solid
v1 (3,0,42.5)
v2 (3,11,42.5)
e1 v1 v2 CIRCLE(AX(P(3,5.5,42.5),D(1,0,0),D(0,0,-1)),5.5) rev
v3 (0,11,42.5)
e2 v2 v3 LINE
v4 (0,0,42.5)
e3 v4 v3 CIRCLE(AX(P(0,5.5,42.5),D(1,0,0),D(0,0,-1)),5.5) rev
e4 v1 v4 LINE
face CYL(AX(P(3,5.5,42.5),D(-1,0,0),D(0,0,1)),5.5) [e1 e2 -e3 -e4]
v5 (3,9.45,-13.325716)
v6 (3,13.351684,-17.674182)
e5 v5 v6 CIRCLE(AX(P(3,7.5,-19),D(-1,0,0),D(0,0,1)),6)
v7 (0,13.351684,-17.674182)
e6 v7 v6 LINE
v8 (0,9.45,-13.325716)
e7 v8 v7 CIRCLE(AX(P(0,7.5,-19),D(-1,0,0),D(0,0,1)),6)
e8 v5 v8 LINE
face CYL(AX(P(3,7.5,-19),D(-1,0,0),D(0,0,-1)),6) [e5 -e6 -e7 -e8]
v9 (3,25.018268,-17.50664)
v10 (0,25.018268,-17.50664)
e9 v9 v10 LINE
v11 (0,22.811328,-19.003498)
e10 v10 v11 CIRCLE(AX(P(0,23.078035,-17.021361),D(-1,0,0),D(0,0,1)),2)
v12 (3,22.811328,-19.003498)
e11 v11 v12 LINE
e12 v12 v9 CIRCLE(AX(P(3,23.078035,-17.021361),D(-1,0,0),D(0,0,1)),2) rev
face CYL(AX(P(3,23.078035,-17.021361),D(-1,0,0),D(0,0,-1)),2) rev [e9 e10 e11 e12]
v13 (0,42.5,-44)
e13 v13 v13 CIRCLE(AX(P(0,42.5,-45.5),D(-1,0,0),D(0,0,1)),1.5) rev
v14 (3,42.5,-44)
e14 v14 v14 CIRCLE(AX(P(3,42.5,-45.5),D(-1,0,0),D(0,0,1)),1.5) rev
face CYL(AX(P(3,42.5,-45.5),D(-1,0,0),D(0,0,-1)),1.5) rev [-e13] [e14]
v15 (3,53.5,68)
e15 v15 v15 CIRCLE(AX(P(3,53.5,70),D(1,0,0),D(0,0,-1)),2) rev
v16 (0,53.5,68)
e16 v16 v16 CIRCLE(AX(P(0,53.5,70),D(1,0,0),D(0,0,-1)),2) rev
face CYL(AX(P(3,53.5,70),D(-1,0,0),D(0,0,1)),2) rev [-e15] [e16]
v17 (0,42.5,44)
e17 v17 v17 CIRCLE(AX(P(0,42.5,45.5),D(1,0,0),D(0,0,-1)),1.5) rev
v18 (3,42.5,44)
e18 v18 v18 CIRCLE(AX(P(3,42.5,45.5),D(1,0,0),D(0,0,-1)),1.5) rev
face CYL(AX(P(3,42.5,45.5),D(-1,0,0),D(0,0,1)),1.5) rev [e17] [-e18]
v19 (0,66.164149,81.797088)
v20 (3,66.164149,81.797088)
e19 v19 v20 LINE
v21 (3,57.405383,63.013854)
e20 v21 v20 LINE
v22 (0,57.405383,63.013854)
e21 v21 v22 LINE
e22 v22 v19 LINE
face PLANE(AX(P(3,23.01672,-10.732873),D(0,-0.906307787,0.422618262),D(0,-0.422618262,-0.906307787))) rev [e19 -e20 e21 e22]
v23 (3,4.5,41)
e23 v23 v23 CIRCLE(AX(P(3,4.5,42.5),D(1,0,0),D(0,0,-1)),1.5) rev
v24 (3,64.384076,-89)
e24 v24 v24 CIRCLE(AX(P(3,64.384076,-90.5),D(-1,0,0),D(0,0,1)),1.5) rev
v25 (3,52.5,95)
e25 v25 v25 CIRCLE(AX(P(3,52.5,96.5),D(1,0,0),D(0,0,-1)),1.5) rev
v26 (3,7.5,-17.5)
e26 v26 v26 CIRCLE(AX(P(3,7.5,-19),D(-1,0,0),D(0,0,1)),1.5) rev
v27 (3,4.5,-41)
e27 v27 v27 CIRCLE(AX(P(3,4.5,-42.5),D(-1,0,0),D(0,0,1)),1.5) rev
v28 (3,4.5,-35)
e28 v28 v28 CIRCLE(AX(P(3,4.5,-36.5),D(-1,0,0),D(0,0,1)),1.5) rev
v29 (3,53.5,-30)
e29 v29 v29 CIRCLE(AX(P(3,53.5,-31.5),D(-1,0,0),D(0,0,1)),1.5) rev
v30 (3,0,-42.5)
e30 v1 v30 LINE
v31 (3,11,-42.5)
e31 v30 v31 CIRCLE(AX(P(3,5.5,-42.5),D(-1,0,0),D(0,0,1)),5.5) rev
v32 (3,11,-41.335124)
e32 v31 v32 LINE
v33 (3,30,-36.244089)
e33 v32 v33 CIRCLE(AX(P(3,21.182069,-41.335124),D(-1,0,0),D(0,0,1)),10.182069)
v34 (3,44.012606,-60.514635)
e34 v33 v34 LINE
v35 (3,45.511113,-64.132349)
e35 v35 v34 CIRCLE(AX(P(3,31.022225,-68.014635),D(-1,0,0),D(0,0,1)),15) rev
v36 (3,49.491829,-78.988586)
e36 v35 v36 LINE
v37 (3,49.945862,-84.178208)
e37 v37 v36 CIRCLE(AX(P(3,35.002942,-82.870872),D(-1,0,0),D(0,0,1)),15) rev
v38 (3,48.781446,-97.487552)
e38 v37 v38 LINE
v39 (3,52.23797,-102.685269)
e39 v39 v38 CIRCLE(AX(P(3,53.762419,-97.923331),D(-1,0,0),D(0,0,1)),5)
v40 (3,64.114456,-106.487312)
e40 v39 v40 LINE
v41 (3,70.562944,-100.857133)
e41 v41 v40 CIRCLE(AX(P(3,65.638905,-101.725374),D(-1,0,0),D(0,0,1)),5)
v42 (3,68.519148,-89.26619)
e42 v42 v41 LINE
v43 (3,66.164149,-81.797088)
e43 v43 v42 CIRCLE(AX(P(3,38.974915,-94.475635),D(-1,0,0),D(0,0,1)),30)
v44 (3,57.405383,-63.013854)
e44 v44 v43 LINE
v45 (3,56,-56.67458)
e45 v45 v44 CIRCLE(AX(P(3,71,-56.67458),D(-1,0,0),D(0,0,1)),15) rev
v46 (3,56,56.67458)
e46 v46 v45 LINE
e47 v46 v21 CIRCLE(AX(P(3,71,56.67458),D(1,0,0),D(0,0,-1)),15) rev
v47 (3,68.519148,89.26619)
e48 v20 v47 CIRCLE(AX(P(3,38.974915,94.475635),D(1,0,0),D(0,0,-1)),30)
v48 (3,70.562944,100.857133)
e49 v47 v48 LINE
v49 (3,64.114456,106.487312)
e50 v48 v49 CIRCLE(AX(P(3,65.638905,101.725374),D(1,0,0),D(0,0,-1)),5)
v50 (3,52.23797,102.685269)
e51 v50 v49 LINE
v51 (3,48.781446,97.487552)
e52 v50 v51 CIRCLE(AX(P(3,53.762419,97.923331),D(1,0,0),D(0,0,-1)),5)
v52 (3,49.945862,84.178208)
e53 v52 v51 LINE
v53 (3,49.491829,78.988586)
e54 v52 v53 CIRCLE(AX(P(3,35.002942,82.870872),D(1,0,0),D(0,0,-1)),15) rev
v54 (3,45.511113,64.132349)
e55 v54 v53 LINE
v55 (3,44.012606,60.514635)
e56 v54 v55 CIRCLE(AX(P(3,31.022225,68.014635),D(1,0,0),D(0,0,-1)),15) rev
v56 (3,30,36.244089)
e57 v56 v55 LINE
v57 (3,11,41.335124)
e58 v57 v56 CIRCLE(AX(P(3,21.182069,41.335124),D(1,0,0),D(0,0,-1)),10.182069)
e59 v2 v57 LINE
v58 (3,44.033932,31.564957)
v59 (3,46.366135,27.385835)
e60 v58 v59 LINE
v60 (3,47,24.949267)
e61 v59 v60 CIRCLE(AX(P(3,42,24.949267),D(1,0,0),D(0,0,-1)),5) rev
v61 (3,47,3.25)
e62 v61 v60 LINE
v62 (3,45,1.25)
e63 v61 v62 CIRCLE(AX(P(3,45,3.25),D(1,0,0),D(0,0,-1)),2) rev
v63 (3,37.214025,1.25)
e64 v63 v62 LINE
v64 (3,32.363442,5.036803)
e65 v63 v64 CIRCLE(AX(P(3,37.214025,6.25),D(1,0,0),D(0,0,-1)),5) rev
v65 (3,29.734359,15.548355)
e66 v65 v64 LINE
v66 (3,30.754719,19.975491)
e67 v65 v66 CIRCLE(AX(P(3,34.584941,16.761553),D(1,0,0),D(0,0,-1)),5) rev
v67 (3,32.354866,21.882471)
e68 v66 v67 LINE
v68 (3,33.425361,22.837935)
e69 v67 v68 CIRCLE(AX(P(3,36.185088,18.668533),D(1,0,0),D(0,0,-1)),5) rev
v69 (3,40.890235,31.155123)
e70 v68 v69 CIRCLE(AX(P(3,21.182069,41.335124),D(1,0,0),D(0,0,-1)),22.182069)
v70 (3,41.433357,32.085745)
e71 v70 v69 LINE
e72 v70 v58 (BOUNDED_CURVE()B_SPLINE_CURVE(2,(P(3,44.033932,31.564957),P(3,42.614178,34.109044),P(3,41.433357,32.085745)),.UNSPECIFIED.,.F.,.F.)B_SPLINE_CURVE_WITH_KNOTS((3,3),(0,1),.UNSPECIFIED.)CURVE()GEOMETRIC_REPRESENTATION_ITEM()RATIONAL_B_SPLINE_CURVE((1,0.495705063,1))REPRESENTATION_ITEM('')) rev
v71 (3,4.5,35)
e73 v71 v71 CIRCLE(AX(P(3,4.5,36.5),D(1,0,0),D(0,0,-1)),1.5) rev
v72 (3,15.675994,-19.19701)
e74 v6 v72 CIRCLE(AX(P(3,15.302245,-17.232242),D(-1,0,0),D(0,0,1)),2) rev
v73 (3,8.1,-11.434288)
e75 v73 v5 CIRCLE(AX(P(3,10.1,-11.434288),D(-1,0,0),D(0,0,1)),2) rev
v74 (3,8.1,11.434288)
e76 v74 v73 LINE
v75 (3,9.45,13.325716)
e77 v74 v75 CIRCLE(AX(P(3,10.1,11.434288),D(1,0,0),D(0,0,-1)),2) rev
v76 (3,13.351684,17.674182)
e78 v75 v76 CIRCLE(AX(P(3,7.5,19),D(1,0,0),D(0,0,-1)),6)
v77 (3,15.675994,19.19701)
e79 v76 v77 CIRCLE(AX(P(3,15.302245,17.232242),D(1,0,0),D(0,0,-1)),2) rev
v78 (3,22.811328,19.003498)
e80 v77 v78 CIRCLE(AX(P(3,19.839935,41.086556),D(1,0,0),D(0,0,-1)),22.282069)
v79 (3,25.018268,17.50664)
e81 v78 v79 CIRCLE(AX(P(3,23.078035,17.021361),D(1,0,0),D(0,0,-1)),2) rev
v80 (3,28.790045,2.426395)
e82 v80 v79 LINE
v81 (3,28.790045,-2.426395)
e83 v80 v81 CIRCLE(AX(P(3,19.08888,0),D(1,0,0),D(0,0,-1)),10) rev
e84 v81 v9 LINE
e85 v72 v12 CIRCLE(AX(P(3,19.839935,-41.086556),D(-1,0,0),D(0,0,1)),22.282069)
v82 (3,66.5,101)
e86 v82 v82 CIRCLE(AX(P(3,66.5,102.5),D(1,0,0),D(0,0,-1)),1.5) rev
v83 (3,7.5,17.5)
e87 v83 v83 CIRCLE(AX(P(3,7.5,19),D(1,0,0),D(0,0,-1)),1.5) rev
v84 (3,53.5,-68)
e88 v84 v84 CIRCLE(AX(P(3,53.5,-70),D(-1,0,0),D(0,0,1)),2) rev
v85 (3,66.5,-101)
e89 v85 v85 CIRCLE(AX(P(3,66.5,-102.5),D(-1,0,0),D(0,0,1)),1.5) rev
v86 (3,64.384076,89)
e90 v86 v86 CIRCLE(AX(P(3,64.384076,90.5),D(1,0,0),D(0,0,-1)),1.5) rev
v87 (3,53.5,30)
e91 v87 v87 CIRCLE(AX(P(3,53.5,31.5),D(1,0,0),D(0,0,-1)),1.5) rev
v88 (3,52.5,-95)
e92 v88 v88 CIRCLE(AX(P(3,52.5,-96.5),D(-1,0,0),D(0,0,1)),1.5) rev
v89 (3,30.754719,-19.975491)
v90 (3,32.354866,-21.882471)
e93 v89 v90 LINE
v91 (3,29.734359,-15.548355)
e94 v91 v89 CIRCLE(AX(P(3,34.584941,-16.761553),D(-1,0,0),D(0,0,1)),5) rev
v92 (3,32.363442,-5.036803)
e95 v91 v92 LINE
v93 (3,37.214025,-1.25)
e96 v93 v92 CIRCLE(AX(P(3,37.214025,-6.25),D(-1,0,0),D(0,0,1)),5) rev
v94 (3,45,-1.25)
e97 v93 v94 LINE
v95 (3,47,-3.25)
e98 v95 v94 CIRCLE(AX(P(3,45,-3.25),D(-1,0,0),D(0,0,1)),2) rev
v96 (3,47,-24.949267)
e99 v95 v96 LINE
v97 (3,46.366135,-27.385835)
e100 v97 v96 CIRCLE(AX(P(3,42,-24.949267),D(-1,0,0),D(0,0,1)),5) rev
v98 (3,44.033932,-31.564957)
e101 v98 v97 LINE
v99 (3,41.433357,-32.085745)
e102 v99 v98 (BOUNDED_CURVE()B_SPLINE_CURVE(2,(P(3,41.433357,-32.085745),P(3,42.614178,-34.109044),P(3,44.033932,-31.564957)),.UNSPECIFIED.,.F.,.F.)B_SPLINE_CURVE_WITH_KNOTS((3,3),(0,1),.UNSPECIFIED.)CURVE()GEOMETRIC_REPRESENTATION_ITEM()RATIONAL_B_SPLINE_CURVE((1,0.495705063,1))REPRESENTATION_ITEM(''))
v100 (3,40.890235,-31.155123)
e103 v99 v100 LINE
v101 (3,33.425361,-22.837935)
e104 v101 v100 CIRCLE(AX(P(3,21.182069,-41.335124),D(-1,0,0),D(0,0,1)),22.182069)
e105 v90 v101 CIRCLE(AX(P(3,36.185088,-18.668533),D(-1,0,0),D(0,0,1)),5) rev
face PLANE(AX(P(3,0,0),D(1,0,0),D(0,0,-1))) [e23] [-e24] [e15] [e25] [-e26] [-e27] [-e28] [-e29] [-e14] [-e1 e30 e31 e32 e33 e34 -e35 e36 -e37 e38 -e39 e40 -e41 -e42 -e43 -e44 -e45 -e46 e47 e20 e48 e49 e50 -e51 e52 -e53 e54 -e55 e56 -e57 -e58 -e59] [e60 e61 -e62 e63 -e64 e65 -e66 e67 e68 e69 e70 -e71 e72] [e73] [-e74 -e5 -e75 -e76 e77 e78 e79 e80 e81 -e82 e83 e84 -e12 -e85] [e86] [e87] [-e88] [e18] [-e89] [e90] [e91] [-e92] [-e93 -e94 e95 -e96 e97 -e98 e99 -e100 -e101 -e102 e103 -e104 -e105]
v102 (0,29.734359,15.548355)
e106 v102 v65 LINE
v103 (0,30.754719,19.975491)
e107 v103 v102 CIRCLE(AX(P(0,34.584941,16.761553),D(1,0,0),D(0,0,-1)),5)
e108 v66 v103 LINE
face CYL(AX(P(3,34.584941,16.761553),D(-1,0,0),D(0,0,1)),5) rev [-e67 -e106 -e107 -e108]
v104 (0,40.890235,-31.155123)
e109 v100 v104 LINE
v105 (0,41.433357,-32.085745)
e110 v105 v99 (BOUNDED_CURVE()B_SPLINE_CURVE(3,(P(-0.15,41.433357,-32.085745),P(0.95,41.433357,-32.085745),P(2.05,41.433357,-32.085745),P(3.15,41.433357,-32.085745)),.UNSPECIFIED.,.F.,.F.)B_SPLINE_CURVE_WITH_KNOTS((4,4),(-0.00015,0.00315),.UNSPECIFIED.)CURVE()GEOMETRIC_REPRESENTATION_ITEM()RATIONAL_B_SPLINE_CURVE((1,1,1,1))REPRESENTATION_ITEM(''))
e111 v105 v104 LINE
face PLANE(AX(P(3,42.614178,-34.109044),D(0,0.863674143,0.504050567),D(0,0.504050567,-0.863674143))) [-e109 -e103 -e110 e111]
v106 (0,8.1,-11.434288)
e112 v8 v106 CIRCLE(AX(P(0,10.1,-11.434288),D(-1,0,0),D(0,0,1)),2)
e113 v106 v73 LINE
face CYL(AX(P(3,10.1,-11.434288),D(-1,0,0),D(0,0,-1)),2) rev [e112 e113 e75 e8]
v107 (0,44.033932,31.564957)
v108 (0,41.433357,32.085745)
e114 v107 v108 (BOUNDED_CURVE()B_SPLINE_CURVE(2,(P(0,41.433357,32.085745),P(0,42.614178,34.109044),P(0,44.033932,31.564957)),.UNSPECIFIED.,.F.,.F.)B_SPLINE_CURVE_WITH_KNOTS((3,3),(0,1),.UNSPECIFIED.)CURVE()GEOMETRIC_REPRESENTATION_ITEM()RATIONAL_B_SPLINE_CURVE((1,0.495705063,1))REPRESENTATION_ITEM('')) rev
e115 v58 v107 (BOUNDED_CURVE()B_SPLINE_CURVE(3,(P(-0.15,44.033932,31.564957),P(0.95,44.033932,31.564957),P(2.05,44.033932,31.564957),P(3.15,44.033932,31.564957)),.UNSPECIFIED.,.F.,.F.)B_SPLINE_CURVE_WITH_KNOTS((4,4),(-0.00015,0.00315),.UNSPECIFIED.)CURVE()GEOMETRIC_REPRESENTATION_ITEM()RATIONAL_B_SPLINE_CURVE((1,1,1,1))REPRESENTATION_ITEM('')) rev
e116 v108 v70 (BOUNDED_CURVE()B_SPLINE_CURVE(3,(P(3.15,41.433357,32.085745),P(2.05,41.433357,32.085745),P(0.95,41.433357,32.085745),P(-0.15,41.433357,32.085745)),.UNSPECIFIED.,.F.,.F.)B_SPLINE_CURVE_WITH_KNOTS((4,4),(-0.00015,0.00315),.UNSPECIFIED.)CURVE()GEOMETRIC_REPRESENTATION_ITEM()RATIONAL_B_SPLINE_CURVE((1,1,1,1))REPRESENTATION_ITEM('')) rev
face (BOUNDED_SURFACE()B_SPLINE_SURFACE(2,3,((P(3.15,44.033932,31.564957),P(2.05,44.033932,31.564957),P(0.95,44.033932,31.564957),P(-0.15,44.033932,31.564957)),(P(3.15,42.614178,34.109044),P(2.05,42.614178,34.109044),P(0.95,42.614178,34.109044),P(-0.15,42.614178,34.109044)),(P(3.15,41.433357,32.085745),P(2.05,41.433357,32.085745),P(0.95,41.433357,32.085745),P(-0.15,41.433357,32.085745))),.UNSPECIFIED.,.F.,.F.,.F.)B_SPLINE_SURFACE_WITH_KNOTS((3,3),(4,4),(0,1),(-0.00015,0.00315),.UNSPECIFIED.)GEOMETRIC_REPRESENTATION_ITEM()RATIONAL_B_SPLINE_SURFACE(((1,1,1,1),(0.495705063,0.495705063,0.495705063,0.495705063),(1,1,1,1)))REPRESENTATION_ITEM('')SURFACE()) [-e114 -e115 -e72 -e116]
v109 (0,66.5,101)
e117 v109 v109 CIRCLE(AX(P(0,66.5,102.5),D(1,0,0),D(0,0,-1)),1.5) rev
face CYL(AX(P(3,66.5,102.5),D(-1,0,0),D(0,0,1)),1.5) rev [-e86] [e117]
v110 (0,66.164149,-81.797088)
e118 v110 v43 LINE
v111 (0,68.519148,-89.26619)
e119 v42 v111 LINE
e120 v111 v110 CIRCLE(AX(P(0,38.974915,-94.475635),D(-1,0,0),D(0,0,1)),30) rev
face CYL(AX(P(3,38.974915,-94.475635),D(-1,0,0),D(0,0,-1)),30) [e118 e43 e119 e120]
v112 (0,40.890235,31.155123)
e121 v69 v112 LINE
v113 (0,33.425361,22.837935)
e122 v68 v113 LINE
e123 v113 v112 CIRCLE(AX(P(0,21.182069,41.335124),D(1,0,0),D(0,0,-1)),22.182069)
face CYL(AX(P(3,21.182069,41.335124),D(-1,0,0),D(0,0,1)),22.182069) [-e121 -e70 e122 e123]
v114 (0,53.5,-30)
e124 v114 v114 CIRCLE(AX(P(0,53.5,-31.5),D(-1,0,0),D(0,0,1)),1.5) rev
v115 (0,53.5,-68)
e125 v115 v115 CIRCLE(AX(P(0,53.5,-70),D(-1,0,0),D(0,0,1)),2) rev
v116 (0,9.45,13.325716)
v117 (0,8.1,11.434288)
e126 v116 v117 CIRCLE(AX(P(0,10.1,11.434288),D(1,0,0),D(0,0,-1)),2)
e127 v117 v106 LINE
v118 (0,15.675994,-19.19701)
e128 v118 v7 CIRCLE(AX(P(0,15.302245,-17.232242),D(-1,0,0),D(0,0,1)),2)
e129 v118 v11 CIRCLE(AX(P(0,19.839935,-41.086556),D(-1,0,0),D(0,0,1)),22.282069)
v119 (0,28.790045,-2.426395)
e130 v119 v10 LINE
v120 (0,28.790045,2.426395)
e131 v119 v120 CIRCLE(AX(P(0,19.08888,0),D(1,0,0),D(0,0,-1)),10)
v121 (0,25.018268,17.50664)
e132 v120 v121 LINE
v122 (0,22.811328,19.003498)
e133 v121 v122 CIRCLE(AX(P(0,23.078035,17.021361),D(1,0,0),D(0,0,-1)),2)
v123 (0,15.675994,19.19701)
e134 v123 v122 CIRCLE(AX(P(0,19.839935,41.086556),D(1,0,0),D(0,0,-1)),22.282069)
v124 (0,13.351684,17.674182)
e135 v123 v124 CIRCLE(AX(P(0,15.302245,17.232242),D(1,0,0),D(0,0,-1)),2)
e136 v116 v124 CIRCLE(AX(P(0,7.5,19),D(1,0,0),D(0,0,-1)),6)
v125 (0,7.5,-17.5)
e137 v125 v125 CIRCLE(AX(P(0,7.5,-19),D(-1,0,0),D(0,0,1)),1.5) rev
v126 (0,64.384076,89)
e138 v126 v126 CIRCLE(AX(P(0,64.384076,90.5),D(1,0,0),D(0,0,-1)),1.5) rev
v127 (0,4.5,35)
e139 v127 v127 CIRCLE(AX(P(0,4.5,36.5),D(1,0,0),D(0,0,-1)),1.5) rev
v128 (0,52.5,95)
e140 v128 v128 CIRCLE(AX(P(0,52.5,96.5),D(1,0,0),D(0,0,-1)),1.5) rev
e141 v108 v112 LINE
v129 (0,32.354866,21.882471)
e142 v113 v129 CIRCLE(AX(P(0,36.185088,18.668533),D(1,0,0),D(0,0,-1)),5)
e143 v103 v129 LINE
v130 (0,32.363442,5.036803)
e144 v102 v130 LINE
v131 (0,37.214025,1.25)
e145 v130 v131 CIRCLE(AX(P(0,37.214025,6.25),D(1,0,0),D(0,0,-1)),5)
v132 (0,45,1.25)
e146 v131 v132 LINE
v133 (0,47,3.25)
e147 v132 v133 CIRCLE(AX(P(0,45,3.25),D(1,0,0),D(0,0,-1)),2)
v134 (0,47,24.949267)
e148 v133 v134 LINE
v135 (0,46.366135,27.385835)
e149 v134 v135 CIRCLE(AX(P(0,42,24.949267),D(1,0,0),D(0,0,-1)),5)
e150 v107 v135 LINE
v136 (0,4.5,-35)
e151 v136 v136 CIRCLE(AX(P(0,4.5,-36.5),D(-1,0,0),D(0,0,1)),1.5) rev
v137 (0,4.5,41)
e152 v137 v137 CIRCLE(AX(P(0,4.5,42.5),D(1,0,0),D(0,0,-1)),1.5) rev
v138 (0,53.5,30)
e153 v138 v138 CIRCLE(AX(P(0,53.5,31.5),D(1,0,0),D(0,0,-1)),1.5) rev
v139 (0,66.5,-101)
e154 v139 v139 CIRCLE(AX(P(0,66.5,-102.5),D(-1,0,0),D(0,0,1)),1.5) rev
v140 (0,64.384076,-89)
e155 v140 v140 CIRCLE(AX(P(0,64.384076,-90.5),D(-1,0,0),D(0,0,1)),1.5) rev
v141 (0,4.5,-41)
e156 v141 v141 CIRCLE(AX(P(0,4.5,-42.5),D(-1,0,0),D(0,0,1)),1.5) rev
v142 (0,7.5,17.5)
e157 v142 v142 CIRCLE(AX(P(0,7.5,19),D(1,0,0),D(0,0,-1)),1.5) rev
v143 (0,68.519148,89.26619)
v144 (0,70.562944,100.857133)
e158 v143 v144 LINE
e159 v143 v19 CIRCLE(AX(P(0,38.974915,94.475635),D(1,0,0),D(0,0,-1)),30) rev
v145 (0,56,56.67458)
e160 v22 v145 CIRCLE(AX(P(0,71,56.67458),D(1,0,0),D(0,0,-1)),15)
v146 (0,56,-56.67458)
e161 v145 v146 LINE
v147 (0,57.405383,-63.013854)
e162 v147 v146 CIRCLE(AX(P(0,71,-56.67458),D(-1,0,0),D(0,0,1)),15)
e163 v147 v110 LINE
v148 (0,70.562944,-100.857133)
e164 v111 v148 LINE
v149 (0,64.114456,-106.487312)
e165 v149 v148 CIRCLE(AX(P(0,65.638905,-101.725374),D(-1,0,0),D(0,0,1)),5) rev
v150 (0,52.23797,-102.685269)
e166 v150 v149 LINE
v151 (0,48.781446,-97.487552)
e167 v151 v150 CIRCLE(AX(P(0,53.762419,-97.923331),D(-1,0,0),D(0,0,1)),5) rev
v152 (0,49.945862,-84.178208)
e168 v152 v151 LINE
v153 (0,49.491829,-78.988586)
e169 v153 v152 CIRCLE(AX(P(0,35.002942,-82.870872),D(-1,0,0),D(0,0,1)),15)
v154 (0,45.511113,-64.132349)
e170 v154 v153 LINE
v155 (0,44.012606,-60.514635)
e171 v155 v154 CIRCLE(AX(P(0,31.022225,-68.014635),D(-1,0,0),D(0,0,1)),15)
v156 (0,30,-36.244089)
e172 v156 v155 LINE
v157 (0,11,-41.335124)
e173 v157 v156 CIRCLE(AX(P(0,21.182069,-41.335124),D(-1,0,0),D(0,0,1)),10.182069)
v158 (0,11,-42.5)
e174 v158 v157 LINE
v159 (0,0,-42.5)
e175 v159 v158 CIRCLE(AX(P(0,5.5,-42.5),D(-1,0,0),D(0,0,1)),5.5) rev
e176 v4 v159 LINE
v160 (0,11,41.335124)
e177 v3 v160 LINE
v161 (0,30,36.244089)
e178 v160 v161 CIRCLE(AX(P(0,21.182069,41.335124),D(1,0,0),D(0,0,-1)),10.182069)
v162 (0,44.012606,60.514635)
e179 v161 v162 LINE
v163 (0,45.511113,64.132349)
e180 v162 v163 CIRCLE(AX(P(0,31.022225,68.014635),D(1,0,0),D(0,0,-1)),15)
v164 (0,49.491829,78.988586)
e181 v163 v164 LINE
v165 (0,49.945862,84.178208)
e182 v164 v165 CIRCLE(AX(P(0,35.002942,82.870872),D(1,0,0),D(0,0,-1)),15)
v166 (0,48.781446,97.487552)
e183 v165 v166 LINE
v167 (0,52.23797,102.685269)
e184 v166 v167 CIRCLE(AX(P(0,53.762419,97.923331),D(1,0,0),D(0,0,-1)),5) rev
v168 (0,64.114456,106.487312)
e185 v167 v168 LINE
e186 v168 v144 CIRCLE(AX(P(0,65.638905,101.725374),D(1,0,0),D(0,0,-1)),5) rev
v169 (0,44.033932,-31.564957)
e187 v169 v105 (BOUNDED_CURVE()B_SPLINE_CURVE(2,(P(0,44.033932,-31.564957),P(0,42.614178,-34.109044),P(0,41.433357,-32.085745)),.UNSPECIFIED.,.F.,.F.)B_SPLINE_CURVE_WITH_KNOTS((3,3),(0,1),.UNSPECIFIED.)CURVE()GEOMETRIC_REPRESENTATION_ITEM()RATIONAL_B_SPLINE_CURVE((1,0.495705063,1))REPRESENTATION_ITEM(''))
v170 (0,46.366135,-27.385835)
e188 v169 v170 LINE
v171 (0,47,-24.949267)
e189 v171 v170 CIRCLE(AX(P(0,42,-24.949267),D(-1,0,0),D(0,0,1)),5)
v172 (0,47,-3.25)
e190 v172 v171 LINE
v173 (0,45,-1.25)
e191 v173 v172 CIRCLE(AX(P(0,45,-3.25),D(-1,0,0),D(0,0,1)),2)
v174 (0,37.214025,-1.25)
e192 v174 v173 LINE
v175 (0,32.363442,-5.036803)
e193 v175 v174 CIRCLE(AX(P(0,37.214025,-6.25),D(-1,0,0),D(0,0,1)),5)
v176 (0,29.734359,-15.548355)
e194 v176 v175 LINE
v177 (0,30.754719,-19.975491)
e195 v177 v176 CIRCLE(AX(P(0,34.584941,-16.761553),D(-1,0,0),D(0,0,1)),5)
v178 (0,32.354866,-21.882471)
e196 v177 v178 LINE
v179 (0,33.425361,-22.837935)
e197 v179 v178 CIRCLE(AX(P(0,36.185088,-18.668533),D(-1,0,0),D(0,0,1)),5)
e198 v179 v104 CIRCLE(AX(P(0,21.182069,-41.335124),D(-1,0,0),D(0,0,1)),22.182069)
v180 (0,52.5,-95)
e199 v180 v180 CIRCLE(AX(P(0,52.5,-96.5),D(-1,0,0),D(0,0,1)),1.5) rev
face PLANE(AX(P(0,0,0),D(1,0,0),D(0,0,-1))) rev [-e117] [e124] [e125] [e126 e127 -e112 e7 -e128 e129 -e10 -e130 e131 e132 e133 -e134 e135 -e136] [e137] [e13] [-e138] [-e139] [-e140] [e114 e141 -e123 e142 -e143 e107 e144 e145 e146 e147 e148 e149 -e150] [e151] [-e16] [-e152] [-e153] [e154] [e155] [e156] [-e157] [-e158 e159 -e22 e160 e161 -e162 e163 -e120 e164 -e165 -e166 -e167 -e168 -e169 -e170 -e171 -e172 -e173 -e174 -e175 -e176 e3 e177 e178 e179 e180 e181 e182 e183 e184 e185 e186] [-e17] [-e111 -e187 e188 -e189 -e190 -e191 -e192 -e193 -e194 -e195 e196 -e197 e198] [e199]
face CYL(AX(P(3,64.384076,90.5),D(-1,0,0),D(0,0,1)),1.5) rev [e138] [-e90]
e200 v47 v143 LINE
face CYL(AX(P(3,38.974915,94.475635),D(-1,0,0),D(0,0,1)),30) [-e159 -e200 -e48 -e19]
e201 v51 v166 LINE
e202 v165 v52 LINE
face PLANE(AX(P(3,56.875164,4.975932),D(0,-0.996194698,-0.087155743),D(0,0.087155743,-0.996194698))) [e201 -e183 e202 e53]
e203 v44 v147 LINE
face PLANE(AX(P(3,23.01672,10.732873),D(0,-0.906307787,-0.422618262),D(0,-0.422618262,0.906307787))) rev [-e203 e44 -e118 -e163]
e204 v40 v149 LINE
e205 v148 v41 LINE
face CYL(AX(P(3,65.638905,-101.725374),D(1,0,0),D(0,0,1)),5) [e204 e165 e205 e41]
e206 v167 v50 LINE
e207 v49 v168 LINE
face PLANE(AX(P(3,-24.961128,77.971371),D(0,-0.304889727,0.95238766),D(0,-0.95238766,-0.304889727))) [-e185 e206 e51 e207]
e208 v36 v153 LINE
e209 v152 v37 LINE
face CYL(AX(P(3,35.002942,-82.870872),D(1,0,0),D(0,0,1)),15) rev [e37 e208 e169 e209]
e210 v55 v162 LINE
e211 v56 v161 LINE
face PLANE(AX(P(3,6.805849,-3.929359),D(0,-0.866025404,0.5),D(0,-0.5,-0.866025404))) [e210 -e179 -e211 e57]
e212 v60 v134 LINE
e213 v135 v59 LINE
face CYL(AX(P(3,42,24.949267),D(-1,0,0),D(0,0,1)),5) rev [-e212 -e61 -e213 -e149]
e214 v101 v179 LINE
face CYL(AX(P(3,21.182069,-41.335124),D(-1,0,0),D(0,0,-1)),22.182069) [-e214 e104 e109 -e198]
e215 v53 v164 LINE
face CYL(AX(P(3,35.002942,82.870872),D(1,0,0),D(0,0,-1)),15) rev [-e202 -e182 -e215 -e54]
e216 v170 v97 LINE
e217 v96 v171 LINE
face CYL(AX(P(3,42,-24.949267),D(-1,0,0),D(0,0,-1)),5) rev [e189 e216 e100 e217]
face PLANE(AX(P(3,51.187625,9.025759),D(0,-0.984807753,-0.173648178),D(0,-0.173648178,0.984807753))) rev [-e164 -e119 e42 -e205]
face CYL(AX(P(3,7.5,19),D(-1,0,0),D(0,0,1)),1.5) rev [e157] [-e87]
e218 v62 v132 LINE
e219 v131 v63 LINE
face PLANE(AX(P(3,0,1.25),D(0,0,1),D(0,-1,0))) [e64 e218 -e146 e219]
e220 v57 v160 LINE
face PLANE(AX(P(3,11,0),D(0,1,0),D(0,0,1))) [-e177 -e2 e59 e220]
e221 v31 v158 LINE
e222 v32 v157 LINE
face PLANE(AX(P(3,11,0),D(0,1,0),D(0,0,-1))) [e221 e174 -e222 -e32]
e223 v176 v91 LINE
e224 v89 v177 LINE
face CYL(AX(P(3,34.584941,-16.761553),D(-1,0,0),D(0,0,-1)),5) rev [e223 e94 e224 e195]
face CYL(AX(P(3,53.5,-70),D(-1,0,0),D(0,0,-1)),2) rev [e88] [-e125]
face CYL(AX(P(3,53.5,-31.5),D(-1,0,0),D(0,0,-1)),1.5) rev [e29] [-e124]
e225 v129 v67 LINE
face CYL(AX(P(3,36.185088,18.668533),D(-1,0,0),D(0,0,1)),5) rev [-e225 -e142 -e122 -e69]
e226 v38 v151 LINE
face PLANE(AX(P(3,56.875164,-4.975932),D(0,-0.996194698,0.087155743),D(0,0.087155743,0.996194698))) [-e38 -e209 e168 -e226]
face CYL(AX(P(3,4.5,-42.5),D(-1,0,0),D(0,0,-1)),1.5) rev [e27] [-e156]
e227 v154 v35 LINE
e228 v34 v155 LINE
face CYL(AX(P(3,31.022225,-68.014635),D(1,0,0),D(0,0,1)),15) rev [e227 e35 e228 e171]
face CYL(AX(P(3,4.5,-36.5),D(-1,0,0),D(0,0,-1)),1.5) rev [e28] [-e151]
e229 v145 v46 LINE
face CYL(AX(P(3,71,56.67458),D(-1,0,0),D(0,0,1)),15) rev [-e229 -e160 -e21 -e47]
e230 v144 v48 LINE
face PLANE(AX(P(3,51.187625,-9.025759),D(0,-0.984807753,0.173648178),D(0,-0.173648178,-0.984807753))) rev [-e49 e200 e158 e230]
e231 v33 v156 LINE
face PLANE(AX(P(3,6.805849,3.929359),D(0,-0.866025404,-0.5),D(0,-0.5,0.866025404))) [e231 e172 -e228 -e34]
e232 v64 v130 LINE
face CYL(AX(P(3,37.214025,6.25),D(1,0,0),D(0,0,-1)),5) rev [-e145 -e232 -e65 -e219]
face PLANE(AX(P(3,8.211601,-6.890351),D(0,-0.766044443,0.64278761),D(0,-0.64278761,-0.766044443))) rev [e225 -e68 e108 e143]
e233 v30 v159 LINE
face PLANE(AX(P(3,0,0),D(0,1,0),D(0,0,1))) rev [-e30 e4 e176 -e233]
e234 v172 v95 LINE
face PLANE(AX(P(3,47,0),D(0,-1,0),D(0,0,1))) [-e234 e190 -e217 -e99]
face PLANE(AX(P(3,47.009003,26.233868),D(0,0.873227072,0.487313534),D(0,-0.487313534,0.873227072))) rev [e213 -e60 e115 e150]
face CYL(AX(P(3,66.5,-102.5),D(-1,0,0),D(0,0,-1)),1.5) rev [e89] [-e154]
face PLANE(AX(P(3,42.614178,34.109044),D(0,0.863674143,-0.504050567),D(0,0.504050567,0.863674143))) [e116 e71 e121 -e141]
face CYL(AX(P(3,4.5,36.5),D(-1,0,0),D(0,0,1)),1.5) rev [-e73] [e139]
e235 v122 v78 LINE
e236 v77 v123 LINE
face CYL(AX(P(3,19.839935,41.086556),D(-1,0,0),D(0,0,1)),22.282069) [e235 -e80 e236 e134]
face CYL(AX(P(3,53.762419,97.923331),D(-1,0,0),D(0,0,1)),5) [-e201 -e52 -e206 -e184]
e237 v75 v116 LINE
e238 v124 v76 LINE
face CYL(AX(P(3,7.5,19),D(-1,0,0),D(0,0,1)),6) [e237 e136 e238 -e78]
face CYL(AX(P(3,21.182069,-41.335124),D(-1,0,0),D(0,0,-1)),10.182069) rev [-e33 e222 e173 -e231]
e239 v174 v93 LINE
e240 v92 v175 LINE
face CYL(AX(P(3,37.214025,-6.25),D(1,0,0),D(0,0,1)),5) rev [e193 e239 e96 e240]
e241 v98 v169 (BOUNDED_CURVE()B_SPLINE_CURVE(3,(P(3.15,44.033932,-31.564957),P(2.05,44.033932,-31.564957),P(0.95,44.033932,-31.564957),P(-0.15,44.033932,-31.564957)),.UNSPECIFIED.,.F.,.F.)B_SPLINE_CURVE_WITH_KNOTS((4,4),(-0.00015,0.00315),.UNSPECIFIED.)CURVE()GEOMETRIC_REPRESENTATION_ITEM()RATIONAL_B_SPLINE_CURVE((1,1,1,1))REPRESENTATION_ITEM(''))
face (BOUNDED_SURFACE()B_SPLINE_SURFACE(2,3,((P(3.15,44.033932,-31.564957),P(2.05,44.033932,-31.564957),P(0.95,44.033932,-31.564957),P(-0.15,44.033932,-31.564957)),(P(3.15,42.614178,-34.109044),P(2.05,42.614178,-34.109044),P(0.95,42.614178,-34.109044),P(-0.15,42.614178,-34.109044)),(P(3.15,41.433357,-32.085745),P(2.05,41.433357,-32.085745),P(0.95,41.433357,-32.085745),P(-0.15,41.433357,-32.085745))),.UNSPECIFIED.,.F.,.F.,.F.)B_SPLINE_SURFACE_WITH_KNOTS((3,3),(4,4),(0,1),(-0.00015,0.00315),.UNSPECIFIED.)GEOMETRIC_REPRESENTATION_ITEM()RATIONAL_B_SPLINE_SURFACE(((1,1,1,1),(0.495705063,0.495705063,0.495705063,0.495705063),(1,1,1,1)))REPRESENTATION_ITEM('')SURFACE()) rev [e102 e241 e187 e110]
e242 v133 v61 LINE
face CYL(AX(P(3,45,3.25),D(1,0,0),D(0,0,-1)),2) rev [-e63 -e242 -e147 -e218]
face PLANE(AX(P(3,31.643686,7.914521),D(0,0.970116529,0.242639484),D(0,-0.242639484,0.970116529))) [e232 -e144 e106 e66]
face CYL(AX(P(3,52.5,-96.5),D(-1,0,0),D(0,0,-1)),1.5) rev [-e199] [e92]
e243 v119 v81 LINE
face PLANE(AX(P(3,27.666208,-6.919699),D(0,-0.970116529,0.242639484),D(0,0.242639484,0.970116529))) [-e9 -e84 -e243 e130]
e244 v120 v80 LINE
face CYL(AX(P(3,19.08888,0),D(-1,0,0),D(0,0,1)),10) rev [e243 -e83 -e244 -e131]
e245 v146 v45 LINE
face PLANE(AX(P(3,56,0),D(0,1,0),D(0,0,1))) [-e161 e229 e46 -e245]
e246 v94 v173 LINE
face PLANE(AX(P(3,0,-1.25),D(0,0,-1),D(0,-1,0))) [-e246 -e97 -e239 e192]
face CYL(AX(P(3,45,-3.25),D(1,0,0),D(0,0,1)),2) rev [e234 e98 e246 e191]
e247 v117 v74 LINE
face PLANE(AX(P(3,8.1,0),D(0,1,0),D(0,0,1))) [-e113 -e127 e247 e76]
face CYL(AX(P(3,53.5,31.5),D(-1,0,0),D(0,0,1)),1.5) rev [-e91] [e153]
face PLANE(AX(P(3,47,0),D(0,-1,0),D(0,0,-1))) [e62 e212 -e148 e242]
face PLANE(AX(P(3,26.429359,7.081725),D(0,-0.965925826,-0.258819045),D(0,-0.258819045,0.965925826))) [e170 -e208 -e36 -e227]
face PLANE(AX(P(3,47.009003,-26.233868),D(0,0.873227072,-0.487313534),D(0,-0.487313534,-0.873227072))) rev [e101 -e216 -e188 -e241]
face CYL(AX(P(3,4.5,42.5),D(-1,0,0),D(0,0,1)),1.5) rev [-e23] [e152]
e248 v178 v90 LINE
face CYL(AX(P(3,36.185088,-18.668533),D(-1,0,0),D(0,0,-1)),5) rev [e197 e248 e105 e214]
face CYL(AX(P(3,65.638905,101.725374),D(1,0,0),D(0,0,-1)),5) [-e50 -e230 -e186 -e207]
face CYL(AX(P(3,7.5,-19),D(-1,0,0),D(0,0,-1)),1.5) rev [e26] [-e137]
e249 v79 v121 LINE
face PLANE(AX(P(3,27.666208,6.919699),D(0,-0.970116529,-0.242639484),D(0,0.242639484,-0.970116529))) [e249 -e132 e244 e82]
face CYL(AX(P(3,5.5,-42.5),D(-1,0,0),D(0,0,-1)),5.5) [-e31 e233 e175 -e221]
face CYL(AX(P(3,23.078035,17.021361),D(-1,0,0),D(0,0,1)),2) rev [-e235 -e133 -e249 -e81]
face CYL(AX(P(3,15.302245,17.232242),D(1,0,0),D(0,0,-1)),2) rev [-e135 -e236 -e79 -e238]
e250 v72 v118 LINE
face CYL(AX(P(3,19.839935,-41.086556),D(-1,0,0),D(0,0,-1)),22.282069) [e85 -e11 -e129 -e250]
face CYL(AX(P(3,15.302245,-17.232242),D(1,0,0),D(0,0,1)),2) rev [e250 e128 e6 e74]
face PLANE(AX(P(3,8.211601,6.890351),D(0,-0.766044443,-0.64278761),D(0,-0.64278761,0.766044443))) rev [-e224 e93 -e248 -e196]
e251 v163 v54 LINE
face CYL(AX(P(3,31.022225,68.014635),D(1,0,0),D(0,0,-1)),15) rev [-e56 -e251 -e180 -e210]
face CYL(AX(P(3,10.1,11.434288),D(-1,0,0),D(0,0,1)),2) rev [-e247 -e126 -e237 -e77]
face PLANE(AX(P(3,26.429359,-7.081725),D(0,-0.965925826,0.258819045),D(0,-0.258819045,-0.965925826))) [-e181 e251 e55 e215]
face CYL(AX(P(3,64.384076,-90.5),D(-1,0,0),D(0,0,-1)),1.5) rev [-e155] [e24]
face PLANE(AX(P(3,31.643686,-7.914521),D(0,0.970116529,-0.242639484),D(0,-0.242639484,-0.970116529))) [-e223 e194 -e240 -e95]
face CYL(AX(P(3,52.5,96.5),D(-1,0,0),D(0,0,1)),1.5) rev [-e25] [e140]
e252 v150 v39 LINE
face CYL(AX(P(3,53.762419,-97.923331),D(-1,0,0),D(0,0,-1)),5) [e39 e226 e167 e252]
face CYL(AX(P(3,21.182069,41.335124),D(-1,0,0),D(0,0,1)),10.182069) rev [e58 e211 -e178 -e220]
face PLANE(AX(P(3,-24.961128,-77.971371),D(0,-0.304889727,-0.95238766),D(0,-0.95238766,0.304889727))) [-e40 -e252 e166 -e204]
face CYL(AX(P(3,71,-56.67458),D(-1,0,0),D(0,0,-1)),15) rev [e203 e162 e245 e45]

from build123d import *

# Parameters (mm, degrees)
SKETCH1_R           = 1.5
SKETCH1_R_2         = 2
BOSS_EXTRUDE1_DEPTH = 3
FILLET1_R           = 5
FILLET2_R           = 10
FILLET3_R           = 2
FILLET4_R           = 5
FILLET5_R           = 2
FILLET6_R           = 5
FILLET7_R           = 15
FILLET8_R           = 15
FILLET9_R           = 30
FILLET10_R          = 5
BOSS_EXTRUDE2_DEPTH = 3
CUT_EXTRUDE1_DEPTH  = 3


with BuildPart() as part:
    # Sketch1 → Boss-Extrude1 (new body)
    with BuildSketch(Plane(origin=(0, 0, 0), x_dir=(0, 0, -1), z_dir=(1, 0, 0))):
        with BuildLine():
            Line((-42.5, 0), (42.5, 0))
            ThreePointArc((42.5, 0), (48, 5.5), (42.5, 11))
            Line((42.5, 11), (41.335123714, 11))
            ThreePointArc((41.335123714, 11), (31.5, 18.546755856), (36.244089058, 30))
            Line((36.244089058, 30), (62.224851171, 45))
            Line((62.224851171, 45), (81.543367697, 50.176380902))
            Line((81.543367697, 50.176380902), (101.467261659, 48.433266047))
            Line((101.467261659, 48.433266047), (109.012004109, 72.000867593))
            Line((109.012004109, 72.000867593), (85.376618037, 67.833311329))
            Line((85.376618037, 67.833311329), (60, 56))
            Line((60, 56), (-60, 56))
            Line((-60, 56), (-85.376618037, 67.833311329))
            Line((-85.376618037, 67.833311329), (-109.012004109, 72.000867593))
            Line((-109.012004109, 72.000867593), (-101.467261659, 48.433266047))
            Line((-101.467261659, 48.433266047), (-81.543367697, 50.176380902))
            Line((-81.543367697, 50.176380902), (-62.224851171, 45))
            Line((-62.224851171, 45), (-36.244089058, 30))
            ThreePointArc((-36.244089058, 30), (-31.5, 18.546755856), (-41.335123714, 11))
            Line((-41.335123714, 11), (-42.5, 11))
            ThreePointArc((-42.5, 11), (-48, 5.5), (-42.5, 0))
        make_face()
        with Locations((31.5, 53.5)):
            Circle(SKETCH1_R, mode=Mode.SUBTRACT)
        with Locations((45.5, 42.5)):
            Circle(SKETCH1_R, mode=Mode.SUBTRACT)
        with Locations((70, 53.5)):
            Circle(SKETCH1_R_2, mode=Mode.SUBTRACT)
        with Locations((90.5, 64.384076231)):
            Circle(SKETCH1_R, mode=Mode.SUBTRACT)
        with Locations((102.5, 66.5)):
            Circle(SKETCH1_R, mode=Mode.SUBTRACT)
        with Locations((96.5, 52.5)):
            Circle(SKETCH1_R, mode=Mode.SUBTRACT)
        with Locations((42.5, 4.5)):
            Circle(SKETCH1_R, mode=Mode.SUBTRACT)
        with Locations((36.5, 4.5)):
            Circle(SKETCH1_R, mode=Mode.SUBTRACT)
        with Locations((19, 7.5)):
            Circle(SKETCH1_R, mode=Mode.SUBTRACT)
        with Locations((-36.5, 4.5)):
            Circle(SKETCH1_R, mode=Mode.SUBTRACT)
        with Locations((-42.5, 4.5)):
            Circle(SKETCH1_R, mode=Mode.SUBTRACT)
        with Locations((-96.5, 52.5)):
            Circle(SKETCH1_R, mode=Mode.SUBTRACT)
        with Locations((-102.5, 66.5)):
            Circle(SKETCH1_R, mode=Mode.SUBTRACT)
        with Locations((-90.5, 64.384076231)):
            Circle(SKETCH1_R, mode=Mode.SUBTRACT)
        with Locations((-70, 53.5)):
            Circle(SKETCH1_R_2, mode=Mode.SUBTRACT)
        with Locations((-45.5, 42.5)):
            Circle(SKETCH1_R, mode=Mode.SUBTRACT)
        with Locations((-31.5, 53.5)):
            Circle(SKETCH1_R, mode=Mode.SUBTRACT)
        with Locations((-19, 7.5)):
            Circle(SKETCH1_R, mode=Mode.SUBTRACT)
        with BuildLine():
            Line((18.022110342, 29.115638387), (1.25, 33.310573815))
            Line((1.25, 33.310573815), (1.25, 47))
            Line((1.25, 47), (26.25, 47))
            Line((26.25, 47), (34.109043647, 42.61417819))
            Line((34.109043647, 42.61417819), (33.125793941, 41.789133724))
            ThreePointArc((33.125793941, 41.789133724), (27.076764403, 38.174520246), (22.46666207, 32.845060102))
            Line((22.46666207, 32.845060102), (18.022110342, 29.115638387))
        make_face(mode=Mode.SUBTRACT)
        with BuildLine():
            Line((-18.022110342, 29.115638387), (-22.46666207, 32.845060102))
            ThreePointArc((-22.46666207, 32.845060102), (-27.076764403, 38.174520246), (-33.125793941, 41.789133724))
            Line((-33.125793941, 41.789133724), (-34.109043647, 42.61417819))
            Line((-34.109043647, 42.61417819), (-26.25, 47))
            Line((-26.25, 47), (-1.25, 47))
            Line((-1.25, 47), (-1.25, 33.310573815))
            Line((-1.25, 33.310573815), (-18.022110342, 29.115638387))
        make_face(mode=Mode.SUBTRACT)
        with BuildLine():
            Line((-13.030075377, 8.1), (13.030075377, 8.1))
            ThreePointArc((13.030075377, 8.1), (15.257332965, 12.189610161), (19.739088719, 13.454304986))
            ThreePointArc((19.739088719, 13.454304986), (18.820952742, 18.98346387), (19.311633684, 24.566814463))
            Line((19.311633684, 24.566814463), (0, 29.3969196))
            Line((0, 29.3969196), (-19.311633684, 24.566814463))
            ThreePointArc((-19.311633684, 24.566814463), (-18.820952742, 18.98346387), (-19.739088719, 13.454304986))
            ThreePointArc((-19.739088719, 13.454304986), (-15.257332965, 12.189610161), (-13.030075377, 8.1))
        make_face(mode=Mode.SUBTRACT)
    extrude(amount=BOSS_EXTRUDE1_DEPTH)

    # Fillet1
    fillet1_edges = [part.edges().sort_by_distance(p)[0] for p in [
        (1.5, 29.115638387, 18.022110342),
        (1.5, 32.845060102, 22.46666207),
    ]]
    fillet(fillet1_edges, radius=FILLET1_R)

    # Fillet2
    fillet2_edges = [part.edges().sort_by_distance(p)[0] for p in [
        (1.5, 29.3969196, 0),
    ]]
    fillet(fillet2_edges, radius=FILLET2_R)

    # Fillet3
    fillet3_edges = [part.edges().sort_by_distance(p)[0] for p in [
        (1.5, 8.1, -13.030075377),
        (1.5, 13.454304986, -19.739088719),
        (1.5, 24.566814463, -19.311633684),
        (1.5, 24.566814463, 19.311633684),
        (1.5, 13.454304986, 19.739088719),
        (1.5, 8.1, 13.030075377),
    ]]
    fillet(fillet3_edges, radius=FILLET3_R)

    # Fillet4
    fillet4_edges = [part.edges().sort_by_distance(p)[0] for p in [
        (1.5, 33.310573815, 1.25),
    ]]
    fillet(fillet4_edges, radius=FILLET4_R)

    # Fillet5
    fillet5_edges = [part.edges().sort_by_distance(p)[0] for p in [
        (1.5, 47, 1.25),
    ]]
    fillet(fillet5_edges, radius=FILLET5_R)

    # Fillet6
    fillet6_edges = [part.edges().sort_by_distance(p)[0] for p in [
        (1.5, 47, 26.25),
    ]]
    fillet(fillet6_edges, radius=FILLET6_R)

    # Fillet7
    fillet7_edges = [part.edges().sort_by_distance(p)[0] for p in [
        (1.5, 45, 62.224851171),
    ]]
    fillet(fillet7_edges, radius=FILLET7_R)

    # Fillet8
    fillet8_edges = [part.edges().sort_by_distance(p)[0] for p in [
        (1.5, 50.176380902, 81.543367697),
        (1.5, 56, 60),
    ]]
    fillet(fillet8_edges, radius=FILLET8_R)

    # Fillet9
    fillet9_edges = [part.edges().sort_by_distance(p)[0] for p in [
        (1.5, 67.833311329, 85.376618037),
    ]]
    fillet(fillet9_edges, radius=FILLET9_R)

    # Fillet10
    fillet10_edges = [part.edges().sort_by_distance(p)[0] for p in [
        (1.5, 48.433266047, 101.467261659),
        (1.5, 72.000867593, 109.012004109),
    ]]
    fillet(fillet10_edges, radius=FILLET10_R)

    # Sketch2 → Boss-Extrude2 (add)
    with BuildSketch(Plane.ZY):
        Polygon((34.109043647, 42.61417819), (31.155122873, 40.890234672), (35.435126155, 42.486892898), align=None)
    extrude(amount=-BOSS_EXTRUDE2_DEPTH)

    # Fillet11
    # an asymmetric fillet: 2, 1 mm, written as the material it adds along each edge
    with BuildSketch(Plane(origin=(0, 42.61417819, 34.109043647), x_dir=(0, 0.4873135344398375, -0.8732270719301786), z_dir=(1, 0, 0))) as fillet11_piece_1:
        with BuildLine():
            Bezier((2.913430357, 0), (0, 0), (1.191368957, -2.01710596), weights=[1, 0.495705063, 1])
            Line((1.191368957, -2.01710596), (0, 0))
            Line((0, 0), (2.913430357, 0))
        make_face()
    extrude(amount=3)

    # Sketch3 → Cut-Extrude1 (cut)
    with BuildSketch(Plane.ZY):
        Polygon((0, 0), (0, 75.071953776), (-134.912211469, 75.071953776), (-134.912211469, -12.246363453), align=None)
    extrude(amount=-CUT_EXTRUDE1_DEPTH, mode=Mode.SUBTRACT)

    # Mirror3: part across plane


with BuildPart() as part_1:
    add(part.part)
    add(part.part.mirror(Plane.XY))


solid = part_1.part
